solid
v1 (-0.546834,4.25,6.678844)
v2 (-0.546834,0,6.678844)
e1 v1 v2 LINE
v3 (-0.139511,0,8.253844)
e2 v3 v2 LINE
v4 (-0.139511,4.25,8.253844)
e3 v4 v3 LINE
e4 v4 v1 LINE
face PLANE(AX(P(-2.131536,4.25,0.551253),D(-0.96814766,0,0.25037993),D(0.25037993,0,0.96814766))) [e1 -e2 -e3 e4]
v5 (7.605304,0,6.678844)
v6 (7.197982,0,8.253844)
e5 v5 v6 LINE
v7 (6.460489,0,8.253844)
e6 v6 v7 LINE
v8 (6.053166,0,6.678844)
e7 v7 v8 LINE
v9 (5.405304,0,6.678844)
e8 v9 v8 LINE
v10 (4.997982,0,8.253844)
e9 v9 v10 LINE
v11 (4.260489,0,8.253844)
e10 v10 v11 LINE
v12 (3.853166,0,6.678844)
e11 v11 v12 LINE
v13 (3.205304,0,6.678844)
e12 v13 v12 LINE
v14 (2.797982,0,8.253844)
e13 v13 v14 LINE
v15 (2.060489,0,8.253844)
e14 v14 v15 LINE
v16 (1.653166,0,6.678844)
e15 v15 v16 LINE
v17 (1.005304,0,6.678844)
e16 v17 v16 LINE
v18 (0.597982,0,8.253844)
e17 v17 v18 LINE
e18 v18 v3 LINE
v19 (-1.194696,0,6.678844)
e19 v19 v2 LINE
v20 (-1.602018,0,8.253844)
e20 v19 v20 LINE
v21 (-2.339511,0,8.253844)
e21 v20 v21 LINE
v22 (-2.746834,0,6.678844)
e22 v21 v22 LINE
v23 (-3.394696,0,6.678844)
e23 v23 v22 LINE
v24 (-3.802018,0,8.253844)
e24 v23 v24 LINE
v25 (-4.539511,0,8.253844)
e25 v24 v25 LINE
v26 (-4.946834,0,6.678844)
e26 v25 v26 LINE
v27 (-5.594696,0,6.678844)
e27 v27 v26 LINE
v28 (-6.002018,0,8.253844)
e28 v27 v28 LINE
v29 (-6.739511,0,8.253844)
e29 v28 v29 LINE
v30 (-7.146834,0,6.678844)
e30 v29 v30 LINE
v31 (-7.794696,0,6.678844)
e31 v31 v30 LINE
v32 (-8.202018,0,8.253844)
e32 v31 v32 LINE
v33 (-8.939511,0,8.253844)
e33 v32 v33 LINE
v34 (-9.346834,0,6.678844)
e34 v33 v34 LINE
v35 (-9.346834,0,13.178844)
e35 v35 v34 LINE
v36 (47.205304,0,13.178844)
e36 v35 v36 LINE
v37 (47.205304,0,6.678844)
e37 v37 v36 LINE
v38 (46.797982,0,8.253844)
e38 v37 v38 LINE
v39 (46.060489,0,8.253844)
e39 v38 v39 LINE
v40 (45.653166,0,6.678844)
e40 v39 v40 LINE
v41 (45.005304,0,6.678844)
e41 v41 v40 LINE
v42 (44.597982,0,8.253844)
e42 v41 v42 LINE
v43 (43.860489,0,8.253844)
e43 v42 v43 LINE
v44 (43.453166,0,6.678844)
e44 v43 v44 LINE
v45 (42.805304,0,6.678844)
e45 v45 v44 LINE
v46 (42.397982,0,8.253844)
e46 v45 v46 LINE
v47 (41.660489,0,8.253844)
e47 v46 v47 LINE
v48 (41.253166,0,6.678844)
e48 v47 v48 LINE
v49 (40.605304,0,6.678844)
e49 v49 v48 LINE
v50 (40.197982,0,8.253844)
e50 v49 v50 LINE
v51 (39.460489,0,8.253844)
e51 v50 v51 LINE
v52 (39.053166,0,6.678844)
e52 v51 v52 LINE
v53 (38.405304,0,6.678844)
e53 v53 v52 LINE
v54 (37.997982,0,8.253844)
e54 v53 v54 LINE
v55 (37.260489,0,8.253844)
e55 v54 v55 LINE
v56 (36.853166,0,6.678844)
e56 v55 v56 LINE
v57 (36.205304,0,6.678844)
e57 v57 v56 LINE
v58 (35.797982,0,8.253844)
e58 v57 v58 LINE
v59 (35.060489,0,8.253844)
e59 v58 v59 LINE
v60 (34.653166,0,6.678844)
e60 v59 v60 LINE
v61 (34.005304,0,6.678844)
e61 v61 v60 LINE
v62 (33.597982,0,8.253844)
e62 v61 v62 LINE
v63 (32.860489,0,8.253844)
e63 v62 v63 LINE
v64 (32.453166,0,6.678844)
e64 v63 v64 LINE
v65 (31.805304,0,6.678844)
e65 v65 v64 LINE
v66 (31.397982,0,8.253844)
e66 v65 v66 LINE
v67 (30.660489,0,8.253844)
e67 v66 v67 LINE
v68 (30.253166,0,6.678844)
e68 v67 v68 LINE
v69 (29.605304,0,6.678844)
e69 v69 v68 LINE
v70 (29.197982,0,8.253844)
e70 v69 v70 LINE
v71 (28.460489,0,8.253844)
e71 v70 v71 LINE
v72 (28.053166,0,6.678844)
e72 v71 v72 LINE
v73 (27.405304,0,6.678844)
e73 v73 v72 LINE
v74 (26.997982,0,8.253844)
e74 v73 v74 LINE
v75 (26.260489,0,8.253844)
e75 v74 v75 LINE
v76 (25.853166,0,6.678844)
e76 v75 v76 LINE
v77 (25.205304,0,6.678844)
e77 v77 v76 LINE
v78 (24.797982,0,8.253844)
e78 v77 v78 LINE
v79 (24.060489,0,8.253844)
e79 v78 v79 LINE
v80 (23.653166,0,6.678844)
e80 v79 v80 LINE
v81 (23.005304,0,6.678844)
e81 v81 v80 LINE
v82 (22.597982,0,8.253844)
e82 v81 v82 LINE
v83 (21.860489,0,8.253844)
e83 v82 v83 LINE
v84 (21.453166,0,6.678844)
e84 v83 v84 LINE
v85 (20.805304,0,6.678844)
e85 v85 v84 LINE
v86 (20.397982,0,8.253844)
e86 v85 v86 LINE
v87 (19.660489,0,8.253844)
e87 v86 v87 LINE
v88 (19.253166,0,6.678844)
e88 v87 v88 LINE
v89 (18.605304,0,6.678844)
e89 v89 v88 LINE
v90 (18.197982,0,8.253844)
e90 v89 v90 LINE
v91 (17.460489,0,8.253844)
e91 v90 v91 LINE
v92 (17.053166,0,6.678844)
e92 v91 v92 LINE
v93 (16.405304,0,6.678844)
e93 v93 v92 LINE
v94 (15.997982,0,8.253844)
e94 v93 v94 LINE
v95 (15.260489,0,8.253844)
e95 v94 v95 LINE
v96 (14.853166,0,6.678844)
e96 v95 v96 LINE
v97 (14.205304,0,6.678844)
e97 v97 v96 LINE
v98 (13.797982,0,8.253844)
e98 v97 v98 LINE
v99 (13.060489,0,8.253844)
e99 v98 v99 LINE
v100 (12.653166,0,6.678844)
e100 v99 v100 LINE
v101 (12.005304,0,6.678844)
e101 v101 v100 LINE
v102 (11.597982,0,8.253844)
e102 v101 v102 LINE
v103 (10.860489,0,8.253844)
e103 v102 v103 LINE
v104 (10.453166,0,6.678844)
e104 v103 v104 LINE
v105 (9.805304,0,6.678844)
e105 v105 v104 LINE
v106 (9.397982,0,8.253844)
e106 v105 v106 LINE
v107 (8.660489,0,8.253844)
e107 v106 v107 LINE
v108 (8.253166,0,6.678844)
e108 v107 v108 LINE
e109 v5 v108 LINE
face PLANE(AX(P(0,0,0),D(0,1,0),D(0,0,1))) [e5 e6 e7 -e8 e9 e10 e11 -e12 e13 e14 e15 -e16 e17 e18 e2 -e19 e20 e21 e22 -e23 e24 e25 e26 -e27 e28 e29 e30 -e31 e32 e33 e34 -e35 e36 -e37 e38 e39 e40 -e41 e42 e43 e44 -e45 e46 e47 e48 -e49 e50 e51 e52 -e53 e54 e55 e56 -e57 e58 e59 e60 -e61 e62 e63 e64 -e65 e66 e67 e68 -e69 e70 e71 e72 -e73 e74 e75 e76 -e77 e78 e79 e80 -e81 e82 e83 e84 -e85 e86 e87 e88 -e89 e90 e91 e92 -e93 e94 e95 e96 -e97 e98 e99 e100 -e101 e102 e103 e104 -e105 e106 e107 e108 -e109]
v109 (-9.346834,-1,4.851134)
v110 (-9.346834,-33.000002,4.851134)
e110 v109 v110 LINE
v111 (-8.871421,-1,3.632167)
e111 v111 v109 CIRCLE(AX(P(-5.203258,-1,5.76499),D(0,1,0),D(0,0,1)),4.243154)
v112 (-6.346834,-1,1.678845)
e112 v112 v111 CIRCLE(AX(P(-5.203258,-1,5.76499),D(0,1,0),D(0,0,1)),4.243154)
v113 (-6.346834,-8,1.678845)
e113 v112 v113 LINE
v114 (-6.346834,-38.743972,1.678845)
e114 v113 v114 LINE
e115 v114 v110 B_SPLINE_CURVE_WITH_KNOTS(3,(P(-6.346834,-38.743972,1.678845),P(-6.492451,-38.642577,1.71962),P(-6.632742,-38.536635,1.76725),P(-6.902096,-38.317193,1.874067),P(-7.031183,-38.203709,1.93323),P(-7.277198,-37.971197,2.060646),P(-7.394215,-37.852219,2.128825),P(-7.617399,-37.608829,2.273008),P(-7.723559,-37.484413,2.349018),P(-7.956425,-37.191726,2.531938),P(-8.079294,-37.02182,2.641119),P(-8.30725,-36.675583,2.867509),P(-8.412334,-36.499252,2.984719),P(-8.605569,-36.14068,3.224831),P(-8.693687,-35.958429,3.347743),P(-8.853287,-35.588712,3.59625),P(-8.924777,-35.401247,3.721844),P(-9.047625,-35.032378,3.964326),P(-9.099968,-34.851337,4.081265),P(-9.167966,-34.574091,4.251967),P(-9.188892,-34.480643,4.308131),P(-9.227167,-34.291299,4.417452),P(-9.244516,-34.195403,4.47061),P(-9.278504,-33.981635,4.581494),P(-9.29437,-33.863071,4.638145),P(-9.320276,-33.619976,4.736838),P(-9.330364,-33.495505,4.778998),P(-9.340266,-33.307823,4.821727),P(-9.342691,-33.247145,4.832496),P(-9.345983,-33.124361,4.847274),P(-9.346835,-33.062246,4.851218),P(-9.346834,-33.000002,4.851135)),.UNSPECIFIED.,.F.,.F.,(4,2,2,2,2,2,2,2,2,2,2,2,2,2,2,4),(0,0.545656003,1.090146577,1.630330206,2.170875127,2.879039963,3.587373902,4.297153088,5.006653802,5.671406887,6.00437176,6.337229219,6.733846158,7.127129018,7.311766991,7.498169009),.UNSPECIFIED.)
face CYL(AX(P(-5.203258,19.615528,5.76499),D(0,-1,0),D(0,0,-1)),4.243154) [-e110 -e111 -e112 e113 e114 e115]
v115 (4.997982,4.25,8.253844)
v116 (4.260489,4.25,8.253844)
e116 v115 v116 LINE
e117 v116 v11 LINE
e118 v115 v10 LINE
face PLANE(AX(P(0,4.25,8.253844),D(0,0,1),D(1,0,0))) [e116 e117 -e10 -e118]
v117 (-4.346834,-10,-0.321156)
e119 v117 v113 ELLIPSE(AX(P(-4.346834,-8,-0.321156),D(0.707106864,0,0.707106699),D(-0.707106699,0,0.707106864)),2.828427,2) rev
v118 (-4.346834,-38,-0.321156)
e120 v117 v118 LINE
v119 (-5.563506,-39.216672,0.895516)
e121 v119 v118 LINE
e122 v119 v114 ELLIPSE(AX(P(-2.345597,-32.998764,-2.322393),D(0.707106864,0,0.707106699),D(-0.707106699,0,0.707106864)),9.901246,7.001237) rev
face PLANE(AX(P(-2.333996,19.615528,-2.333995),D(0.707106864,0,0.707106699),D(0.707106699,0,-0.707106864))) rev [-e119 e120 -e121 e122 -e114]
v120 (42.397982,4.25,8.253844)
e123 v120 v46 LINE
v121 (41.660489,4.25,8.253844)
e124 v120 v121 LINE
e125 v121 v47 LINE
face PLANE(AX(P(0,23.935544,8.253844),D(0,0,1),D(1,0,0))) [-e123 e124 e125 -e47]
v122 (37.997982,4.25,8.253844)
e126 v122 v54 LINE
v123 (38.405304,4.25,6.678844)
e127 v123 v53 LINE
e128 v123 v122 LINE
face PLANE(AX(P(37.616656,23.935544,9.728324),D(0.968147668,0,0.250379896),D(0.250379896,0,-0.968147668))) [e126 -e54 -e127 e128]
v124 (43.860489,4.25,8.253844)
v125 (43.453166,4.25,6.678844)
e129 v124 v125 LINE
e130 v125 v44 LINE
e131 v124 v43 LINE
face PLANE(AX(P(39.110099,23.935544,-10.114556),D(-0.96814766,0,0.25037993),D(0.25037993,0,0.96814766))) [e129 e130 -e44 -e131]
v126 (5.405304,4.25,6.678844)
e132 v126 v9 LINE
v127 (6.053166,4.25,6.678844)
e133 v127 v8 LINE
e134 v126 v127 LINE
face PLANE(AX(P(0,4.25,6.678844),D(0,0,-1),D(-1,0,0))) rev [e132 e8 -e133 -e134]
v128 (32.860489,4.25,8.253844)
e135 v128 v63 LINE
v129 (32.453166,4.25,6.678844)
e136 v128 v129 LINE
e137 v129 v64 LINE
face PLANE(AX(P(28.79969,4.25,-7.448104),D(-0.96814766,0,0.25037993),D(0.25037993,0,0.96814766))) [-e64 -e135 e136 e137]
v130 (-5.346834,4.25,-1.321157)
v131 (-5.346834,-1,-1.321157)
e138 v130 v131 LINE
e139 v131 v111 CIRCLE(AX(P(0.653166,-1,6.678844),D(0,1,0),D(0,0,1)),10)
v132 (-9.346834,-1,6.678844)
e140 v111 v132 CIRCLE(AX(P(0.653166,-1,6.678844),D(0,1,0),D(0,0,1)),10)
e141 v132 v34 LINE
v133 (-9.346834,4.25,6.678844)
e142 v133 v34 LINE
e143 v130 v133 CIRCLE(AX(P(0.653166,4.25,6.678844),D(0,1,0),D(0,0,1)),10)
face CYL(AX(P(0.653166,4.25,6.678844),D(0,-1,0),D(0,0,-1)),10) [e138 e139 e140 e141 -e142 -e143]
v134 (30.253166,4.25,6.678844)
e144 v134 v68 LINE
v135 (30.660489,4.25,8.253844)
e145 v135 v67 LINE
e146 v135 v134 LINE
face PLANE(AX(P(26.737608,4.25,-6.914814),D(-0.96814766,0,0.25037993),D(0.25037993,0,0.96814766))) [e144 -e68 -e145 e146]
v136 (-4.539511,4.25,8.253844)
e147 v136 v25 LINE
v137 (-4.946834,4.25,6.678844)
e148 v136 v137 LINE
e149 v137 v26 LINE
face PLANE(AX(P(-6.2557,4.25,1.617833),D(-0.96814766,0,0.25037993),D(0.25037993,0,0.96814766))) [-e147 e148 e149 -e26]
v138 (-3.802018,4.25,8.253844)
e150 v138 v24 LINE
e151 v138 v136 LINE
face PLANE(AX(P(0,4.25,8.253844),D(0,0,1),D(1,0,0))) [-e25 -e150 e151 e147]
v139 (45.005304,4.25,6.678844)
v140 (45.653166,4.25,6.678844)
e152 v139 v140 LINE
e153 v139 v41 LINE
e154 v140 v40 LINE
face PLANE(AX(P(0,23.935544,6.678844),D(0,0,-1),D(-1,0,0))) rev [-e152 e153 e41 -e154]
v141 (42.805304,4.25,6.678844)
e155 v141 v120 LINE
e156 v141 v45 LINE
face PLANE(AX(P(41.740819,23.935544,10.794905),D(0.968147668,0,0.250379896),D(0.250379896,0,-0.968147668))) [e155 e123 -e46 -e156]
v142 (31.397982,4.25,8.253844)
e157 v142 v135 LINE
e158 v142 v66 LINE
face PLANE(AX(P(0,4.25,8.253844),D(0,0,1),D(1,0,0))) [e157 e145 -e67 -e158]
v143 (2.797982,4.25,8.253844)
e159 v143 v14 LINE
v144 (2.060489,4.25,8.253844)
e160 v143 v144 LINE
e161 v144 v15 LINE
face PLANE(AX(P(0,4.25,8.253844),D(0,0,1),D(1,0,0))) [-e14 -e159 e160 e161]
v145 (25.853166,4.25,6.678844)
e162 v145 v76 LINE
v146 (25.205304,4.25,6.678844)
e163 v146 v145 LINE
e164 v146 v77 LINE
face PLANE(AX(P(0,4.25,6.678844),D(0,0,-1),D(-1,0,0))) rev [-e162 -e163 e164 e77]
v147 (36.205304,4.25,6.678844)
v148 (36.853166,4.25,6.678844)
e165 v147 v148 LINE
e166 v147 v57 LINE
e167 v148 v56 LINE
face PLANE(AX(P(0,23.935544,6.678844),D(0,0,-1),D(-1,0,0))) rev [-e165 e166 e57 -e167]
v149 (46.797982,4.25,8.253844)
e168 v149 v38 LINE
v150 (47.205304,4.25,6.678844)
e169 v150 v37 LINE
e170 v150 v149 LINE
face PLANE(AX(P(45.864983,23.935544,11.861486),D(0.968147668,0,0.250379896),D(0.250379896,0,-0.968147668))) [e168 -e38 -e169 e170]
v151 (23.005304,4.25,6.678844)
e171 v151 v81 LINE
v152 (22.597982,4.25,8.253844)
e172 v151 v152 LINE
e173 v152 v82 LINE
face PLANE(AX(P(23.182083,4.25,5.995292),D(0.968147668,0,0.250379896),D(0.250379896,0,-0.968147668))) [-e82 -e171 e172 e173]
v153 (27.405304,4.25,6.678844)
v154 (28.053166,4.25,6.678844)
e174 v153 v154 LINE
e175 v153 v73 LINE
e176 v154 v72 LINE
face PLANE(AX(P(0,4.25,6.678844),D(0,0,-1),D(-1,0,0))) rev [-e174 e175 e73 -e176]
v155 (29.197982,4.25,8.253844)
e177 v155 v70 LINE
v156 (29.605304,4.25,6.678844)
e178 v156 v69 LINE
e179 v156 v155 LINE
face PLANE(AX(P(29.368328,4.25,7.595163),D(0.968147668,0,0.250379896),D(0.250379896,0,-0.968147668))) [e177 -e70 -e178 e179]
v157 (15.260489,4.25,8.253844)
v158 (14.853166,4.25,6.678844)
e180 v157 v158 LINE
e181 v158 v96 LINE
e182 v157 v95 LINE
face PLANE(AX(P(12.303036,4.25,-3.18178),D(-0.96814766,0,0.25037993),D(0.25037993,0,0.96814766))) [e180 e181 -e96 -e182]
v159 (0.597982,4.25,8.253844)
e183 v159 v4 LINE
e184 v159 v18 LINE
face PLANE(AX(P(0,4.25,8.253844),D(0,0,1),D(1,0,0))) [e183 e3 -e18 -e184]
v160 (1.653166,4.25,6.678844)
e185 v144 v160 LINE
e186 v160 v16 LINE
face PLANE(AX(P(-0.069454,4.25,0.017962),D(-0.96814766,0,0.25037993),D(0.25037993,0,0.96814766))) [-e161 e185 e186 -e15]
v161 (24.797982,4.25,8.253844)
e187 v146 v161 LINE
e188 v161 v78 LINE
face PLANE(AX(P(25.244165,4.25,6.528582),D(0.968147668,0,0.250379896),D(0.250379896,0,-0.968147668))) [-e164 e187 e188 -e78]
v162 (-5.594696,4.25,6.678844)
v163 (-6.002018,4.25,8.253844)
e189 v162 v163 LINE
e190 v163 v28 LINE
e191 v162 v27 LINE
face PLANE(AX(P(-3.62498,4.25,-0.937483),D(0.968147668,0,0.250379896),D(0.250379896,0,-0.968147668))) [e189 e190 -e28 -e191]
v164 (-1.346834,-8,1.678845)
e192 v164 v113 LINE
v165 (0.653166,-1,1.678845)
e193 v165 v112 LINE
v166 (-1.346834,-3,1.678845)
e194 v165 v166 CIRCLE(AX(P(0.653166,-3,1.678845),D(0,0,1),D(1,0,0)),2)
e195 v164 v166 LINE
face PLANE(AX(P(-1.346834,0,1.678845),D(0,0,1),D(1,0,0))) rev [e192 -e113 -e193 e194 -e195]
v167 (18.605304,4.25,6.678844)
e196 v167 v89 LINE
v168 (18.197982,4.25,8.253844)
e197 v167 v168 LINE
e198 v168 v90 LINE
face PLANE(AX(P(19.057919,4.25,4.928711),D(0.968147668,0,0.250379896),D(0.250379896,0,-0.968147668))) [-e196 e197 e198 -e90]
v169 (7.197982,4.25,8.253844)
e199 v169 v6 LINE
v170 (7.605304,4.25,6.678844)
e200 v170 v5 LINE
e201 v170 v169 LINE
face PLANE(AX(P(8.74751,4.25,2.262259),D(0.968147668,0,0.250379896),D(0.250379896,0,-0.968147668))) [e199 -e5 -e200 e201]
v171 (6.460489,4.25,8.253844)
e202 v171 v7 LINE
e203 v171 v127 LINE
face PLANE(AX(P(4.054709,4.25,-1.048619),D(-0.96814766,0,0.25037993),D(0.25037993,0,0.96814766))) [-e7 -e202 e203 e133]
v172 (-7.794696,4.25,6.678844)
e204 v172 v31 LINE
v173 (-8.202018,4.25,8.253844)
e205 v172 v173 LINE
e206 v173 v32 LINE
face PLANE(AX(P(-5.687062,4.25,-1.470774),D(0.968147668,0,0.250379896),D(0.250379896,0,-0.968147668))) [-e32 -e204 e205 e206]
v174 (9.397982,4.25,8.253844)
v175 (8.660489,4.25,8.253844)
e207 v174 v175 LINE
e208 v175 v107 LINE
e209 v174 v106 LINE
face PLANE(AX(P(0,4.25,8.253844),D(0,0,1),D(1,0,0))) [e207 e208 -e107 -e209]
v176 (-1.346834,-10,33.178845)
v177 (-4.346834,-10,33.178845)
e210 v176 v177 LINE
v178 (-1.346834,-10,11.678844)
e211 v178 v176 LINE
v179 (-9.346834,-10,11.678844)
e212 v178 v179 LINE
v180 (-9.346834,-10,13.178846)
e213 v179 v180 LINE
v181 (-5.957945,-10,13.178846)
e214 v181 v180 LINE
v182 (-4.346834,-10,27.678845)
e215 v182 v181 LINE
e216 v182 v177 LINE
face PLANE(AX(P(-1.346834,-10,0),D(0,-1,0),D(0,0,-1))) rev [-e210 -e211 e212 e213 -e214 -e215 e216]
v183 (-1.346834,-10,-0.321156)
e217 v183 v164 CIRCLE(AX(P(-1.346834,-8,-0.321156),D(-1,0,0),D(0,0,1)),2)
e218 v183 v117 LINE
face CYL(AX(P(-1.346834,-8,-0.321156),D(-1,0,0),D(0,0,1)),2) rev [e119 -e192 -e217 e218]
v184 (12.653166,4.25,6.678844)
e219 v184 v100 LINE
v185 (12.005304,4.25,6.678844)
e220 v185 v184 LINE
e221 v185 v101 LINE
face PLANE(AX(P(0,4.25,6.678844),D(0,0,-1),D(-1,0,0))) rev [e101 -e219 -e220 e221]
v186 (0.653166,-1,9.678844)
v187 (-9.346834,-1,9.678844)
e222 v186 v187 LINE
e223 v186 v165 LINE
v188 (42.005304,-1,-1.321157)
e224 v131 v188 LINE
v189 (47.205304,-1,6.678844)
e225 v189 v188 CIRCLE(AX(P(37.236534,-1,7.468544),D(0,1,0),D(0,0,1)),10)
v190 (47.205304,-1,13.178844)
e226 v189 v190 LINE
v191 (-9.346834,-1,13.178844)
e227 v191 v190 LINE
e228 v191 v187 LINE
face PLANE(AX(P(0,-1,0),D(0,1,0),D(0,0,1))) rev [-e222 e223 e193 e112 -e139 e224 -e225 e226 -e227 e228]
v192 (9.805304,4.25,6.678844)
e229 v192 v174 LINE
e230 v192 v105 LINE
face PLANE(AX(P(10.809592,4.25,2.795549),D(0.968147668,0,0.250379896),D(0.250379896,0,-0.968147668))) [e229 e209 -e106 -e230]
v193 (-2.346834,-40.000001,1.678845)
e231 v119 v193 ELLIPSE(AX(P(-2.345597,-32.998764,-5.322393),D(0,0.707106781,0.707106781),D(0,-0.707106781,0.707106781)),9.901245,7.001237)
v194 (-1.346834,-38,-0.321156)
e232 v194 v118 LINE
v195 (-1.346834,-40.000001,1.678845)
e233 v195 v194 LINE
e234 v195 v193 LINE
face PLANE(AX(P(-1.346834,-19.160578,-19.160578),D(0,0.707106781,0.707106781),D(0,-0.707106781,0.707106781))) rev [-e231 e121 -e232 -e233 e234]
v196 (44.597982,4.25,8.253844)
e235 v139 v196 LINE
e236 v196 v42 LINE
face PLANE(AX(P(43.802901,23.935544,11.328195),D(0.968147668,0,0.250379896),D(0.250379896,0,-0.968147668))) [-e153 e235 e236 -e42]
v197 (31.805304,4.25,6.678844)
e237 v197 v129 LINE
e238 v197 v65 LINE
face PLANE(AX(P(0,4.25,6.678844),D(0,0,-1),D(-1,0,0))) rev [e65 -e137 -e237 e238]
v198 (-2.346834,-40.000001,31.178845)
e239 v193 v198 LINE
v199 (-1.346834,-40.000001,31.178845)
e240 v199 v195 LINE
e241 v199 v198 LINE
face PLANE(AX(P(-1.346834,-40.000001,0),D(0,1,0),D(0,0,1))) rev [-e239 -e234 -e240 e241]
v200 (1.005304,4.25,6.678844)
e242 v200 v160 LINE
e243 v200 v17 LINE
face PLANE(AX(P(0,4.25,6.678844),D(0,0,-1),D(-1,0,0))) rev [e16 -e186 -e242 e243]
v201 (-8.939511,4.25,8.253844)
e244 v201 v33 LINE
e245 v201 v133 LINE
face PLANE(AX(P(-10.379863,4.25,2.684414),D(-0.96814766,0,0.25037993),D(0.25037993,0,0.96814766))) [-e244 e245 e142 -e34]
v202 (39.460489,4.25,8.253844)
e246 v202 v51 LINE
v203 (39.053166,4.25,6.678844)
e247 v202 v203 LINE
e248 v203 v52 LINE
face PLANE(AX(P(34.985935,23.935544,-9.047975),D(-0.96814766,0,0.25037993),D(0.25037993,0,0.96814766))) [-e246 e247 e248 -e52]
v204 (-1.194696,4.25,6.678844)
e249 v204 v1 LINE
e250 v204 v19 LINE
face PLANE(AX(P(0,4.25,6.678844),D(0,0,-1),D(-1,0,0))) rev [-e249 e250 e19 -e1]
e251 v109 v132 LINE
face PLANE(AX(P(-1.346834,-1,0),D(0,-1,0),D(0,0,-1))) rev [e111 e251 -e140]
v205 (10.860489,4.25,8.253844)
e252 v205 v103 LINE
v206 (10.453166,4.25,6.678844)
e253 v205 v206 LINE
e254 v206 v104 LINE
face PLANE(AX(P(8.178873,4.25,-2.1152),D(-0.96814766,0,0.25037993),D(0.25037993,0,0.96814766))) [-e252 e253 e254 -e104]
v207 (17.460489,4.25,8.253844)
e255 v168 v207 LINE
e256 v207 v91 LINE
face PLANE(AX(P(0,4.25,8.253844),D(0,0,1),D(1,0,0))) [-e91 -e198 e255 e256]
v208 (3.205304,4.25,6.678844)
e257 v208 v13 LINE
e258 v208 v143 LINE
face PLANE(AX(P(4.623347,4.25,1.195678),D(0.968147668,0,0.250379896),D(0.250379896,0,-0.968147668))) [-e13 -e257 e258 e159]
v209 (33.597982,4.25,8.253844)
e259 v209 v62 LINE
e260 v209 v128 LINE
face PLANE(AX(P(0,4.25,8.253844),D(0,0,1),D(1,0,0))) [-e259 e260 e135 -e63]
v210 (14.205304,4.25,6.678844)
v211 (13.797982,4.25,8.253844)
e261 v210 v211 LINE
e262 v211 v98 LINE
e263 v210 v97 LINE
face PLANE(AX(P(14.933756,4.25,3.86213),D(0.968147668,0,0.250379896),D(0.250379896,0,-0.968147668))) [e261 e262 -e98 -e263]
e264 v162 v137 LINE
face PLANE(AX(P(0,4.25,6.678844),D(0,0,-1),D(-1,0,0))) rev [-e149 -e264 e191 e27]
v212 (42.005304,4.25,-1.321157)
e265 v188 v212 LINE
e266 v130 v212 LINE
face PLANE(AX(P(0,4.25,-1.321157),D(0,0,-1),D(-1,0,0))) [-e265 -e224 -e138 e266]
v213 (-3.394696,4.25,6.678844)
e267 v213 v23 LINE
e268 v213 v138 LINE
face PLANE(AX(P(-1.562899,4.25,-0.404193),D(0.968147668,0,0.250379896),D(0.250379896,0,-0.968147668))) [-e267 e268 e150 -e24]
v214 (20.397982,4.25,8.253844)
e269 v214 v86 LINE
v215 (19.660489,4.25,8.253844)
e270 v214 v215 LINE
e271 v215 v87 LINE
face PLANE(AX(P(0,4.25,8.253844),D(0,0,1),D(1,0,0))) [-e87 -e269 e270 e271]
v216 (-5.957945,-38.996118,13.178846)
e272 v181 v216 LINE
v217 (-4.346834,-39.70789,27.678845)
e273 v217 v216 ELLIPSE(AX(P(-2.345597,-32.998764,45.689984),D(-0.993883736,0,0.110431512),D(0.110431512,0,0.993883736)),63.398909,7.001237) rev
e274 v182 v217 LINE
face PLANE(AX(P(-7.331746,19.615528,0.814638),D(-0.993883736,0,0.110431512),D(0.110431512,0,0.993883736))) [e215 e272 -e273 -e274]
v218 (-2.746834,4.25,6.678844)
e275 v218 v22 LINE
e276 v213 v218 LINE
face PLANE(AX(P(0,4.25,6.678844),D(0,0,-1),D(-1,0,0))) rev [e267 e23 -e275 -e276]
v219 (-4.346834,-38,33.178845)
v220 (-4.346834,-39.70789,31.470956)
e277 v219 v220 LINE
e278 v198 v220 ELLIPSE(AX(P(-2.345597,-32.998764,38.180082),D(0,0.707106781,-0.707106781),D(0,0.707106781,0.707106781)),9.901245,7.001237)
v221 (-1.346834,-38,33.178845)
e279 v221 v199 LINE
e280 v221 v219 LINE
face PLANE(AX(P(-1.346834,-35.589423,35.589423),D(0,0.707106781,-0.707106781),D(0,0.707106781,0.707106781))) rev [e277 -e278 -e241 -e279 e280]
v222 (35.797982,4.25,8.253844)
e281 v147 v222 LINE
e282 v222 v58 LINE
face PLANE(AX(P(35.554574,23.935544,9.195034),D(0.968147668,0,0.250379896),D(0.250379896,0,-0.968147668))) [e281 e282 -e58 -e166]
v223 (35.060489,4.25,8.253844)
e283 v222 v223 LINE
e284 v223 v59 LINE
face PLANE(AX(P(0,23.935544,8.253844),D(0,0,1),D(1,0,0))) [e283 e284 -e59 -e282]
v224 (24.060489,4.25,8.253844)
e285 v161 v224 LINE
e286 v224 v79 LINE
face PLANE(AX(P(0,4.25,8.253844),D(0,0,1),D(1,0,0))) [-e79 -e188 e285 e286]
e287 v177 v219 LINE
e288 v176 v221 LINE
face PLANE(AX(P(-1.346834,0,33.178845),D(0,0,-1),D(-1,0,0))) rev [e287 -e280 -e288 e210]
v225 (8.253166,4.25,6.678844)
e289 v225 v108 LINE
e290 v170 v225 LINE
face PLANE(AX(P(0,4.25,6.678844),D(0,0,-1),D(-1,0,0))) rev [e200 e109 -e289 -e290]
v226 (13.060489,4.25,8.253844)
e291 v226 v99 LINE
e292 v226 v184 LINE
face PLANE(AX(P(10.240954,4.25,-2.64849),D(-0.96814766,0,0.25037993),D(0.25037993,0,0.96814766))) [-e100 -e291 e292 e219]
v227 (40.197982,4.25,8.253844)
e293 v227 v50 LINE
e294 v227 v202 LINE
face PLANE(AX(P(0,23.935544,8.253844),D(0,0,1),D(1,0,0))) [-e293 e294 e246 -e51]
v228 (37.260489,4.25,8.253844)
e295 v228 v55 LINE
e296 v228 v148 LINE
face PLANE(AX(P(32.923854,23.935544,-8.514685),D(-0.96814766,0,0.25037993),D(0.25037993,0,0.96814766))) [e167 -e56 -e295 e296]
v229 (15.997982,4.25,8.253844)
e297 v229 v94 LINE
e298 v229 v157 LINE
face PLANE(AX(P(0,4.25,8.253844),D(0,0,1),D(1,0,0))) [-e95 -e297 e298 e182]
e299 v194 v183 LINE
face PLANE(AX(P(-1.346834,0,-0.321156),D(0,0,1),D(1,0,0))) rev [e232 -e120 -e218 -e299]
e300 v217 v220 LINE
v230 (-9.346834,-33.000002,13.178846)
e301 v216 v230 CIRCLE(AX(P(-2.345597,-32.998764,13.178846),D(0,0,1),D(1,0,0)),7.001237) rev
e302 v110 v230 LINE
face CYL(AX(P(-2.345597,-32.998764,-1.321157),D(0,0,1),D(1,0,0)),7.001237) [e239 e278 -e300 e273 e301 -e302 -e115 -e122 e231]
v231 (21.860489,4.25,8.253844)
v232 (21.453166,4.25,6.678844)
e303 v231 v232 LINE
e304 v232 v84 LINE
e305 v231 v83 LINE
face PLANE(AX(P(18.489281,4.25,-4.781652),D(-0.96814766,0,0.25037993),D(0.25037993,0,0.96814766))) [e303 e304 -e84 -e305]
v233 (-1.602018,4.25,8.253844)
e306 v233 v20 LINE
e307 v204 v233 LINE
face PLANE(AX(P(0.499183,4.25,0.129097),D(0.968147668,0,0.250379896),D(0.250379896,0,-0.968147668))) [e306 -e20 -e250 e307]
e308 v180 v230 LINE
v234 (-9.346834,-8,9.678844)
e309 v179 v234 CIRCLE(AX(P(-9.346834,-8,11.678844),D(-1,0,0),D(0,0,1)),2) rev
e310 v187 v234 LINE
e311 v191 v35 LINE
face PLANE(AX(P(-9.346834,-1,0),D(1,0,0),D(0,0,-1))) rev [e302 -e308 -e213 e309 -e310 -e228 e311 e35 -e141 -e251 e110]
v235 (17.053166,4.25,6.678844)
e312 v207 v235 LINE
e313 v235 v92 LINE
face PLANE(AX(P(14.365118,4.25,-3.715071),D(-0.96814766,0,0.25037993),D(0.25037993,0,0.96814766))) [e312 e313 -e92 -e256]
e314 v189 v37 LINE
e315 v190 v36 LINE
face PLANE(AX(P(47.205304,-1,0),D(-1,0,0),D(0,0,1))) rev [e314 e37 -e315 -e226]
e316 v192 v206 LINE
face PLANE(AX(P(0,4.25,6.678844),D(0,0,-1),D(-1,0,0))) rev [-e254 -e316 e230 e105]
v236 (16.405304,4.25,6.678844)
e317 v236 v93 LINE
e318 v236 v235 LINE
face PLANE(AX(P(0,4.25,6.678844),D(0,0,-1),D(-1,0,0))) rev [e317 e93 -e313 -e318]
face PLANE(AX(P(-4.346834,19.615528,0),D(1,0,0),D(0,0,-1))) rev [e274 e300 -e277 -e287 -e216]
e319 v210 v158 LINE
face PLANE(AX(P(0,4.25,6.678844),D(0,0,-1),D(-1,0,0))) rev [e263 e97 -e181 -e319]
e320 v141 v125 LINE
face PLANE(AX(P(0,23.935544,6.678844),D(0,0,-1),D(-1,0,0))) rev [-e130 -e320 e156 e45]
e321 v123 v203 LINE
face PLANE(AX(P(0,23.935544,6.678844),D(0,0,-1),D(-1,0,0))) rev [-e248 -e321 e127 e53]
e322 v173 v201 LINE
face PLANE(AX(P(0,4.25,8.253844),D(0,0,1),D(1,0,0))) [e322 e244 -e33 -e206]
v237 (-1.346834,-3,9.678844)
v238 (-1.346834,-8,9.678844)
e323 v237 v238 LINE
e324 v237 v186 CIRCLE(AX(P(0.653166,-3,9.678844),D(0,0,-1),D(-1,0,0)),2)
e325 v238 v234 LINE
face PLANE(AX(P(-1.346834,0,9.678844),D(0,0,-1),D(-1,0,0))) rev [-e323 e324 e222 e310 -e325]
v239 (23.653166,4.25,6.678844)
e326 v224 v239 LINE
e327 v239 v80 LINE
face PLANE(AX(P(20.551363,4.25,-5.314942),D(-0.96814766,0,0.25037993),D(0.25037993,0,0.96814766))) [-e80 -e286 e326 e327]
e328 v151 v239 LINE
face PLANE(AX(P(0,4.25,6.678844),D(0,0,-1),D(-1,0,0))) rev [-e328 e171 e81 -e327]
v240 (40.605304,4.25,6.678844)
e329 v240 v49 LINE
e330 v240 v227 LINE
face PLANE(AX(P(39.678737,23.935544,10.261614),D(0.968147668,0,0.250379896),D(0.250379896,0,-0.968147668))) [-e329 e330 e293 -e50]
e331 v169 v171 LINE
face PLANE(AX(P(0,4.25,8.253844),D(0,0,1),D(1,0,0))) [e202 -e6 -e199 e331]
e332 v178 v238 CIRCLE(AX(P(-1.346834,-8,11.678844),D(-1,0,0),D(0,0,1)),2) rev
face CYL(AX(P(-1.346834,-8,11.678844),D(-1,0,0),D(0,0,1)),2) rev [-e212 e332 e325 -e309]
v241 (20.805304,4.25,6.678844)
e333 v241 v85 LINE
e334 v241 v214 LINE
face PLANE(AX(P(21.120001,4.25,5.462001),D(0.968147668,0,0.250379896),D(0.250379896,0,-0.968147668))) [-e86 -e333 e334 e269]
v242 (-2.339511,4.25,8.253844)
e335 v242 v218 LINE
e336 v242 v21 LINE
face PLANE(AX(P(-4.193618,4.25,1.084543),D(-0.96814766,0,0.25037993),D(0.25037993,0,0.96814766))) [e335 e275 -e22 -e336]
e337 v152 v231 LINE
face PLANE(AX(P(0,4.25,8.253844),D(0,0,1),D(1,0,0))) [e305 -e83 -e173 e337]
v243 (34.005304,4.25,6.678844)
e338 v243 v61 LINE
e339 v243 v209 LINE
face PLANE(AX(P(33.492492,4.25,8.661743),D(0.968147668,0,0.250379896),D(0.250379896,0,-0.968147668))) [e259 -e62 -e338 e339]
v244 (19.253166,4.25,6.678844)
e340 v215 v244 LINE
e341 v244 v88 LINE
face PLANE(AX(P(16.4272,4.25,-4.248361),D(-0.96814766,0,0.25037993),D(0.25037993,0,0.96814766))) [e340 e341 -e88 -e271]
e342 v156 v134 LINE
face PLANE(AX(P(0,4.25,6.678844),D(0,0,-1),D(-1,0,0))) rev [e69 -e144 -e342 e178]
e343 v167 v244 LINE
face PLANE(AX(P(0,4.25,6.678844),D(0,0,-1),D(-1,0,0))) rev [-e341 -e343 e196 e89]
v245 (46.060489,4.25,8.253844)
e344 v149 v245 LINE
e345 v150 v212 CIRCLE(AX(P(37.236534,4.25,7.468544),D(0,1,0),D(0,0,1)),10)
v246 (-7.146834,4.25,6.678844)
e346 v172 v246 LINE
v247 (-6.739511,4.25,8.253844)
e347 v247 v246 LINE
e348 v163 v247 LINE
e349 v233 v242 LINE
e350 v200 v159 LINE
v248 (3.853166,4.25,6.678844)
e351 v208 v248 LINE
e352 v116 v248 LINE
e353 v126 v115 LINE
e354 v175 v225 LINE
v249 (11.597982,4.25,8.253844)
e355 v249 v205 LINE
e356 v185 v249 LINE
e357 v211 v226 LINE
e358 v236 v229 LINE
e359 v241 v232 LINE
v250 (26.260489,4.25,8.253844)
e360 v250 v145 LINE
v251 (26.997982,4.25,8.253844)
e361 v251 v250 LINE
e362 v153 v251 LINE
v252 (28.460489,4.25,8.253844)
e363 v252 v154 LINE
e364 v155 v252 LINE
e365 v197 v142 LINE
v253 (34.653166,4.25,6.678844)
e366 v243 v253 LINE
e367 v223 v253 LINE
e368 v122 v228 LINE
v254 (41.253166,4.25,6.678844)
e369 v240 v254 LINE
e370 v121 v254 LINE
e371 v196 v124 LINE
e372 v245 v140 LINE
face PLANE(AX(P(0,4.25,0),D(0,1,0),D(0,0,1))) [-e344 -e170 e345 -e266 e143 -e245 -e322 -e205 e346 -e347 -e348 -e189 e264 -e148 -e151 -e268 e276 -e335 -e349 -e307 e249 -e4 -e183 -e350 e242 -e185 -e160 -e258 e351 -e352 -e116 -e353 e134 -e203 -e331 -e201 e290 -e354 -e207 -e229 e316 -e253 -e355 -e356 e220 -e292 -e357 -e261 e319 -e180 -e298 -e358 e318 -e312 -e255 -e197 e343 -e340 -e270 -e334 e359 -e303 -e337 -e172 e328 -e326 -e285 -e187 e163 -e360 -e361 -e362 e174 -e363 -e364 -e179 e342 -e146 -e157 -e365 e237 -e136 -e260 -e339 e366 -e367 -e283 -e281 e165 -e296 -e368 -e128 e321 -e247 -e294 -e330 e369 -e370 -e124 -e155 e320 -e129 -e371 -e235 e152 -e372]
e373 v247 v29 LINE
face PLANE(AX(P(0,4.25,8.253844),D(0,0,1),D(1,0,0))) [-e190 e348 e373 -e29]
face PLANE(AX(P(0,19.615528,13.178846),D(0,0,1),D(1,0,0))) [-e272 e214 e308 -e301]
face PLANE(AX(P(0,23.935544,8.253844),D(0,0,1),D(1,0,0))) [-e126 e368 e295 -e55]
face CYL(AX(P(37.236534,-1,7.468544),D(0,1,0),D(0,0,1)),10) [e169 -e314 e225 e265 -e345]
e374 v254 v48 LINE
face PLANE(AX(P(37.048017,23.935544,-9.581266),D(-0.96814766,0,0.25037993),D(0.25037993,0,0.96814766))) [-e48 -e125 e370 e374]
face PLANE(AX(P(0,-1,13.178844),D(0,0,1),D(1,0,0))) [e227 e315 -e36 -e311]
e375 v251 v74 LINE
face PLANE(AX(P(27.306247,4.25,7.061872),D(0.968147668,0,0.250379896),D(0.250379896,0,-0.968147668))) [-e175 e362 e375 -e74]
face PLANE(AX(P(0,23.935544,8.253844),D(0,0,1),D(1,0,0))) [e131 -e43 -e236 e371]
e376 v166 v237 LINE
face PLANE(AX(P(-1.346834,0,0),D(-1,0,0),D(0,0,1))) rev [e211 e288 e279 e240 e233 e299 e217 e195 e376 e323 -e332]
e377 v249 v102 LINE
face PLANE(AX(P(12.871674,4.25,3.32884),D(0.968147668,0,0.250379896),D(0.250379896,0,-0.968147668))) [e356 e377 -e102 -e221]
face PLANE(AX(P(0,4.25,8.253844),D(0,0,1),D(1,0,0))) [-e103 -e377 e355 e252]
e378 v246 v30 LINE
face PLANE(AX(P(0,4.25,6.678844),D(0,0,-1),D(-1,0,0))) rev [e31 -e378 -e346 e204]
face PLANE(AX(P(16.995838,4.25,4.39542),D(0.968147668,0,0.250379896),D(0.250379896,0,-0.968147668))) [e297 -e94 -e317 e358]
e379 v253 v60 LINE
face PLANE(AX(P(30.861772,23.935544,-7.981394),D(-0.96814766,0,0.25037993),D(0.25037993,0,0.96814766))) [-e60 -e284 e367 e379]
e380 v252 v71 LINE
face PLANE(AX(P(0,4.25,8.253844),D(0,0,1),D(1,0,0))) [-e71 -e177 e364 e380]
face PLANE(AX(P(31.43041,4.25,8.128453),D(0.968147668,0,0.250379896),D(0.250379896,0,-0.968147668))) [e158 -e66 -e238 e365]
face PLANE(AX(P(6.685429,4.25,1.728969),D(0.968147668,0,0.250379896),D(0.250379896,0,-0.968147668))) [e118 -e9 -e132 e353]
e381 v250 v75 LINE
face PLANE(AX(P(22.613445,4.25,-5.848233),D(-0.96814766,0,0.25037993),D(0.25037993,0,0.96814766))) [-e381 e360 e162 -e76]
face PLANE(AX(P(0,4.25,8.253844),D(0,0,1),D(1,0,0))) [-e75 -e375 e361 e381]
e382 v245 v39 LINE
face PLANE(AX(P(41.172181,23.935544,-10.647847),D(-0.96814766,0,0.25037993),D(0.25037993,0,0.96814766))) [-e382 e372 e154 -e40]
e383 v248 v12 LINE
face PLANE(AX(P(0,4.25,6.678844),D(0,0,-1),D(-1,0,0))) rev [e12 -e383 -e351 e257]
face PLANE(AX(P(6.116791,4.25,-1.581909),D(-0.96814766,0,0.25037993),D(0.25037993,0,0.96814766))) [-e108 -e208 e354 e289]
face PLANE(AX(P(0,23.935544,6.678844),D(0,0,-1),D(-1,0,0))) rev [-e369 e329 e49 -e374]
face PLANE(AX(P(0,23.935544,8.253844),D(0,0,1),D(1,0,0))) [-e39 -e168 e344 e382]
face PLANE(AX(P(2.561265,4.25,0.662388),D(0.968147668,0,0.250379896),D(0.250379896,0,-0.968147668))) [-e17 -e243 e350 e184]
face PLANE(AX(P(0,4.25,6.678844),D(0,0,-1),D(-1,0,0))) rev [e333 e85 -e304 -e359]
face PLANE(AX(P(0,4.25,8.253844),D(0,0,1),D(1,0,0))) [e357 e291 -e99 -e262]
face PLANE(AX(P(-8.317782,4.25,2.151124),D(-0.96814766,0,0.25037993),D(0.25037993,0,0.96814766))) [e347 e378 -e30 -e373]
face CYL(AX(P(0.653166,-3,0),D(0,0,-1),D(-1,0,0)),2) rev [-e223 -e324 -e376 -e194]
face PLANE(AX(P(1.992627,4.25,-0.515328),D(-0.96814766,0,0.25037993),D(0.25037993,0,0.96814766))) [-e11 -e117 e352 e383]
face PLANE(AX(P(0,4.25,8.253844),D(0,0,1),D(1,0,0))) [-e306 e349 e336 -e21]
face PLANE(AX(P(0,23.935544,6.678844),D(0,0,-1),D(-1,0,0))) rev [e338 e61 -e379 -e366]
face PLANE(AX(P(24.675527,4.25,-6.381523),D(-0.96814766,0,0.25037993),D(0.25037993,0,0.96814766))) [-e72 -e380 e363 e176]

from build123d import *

# Parameters (mm, degrees)
BOSS_EXTRUDE1_DEPTH = 4.25
BOSS_EXTRUDE2_START = -1
BOSS_EXTRUDE2_DEPTH = 1
BOSS_EXTRUDE3_DEPTH = 8
CUT_EXTRUDE2_DEPTH  = 63.822057505
CUT_EXTRUDE4_START  = -39.000000805
CUT_EXTRUDE4_DEPTH  = 38.707889695
BOSS_EXTRUDE5_START = -1
BOSS_EXTRUDE5_DEPTH = 1
BOSS_EXTRUDE6_DEPTH = 4.25
FILLET1_R           = 2


# Read off the part's stored shape, not the designer's step: Cut-Extrude4
with BuildPart() as part:
    # Sketch1 → Boss-Extrude1 (new body)
    with BuildSketch(Plane(origin=(0, 0, 0), x_dir=(1, 0, 0), z_dir=(0, 1, 0))):
        with BuildLine():
            Line((33.597981706, -8.253844427), (34.005304366, -6.678843843))
            ThreePointArc((34.005304366, -6.678843843), (32.949576248, -2.206707665), (30.005304176, 1.321156537))
            Line((30.005304176, 1.321156537), (-5.346833689, 1.321156537))
            ThreePointArc((-5.346833689, 1.321156537), (-8.291105761, -2.206707665), (-9.346833879, -6.678843843))
            Line((-9.346833879, -6.678843843), (-8.939511162, -8.253844427))
            Line((-8.939511162, -8.253844427), (-8.202018294, -8.253844427))
            Line((-8.202018294, -8.253844427), (-7.794695634, -6.678843843))
            Line((-7.794695634, -6.678843843), (-7.146833879, -6.678843843))
            Line((-7.146833879, -6.678843843), (-6.739511162, -8.253844427))
            Line((-6.739511162, -8.253844427), (-6.002018294, -8.253844427))
            Line((-6.002018294, -8.253844427), (-5.594695634, -6.678843843))
            Line((-5.594695634, -6.678843843), (-4.946833879, -6.678843843))
            Line((-4.946833879, -6.678843843), (-4.539511162, -8.253844427))
            Line((-4.539511162, -8.253844427), (-3.802018294, -8.253844427))
            Line((-3.802018294, -8.253844427), (-3.394695634, -6.678843843))
            Line((-3.394695634, -6.678843843), (-2.746833879, -6.678843843))
            Line((-2.746833879, -6.678843843), (-2.339511162, -8.253844427))
            Line((-2.339511162, -8.253844427), (-1.602018294, -8.253844427))
            Line((-1.602018294, -8.253844427), (-1.194695634, -6.678843843))
            Line((-1.194695634, -6.678843843), (-0.546833879, -6.678843843))
            Line((-0.546833879, -6.678843843), (-0.139511162, -8.253844427))
            Line((-0.139511162, -8.253844427), (0.597981706, -8.253844427))
            Line((0.597981706, -8.253844427), (1.005304366, -6.678843843))
            Line((1.005304366, -6.678843843), (1.653166121, -6.678843843))
            Line((1.653166121, -6.678843843), (2.060488838, -8.253844427))
            Line((2.060488838, -8.253844427), (2.797981706, -8.253844427))
            Line((2.797981706, -8.253844427), (3.205304366, -6.678843843))
            Line((3.205304366, -6.678843843), (3.853166121, -6.678843843))
            Line((3.853166121, -6.678843843), (4.260488838, -8.253844427))
            Line((4.260488838, -8.253844427), (4.997981706, -8.253844427))
            Line((4.997981706, -8.253844427), (5.405304366, -6.678843843))
            Line((5.405304366, -6.678843843), (6.053166121, -6.678843843))
            Line((6.053166121, -6.678843843), (6.460488838, -8.253844427))
            Line((6.460488838, -8.253844427), (7.197981706, -8.253844427))
            Line((7.197981706, -8.253844427), (7.605304366, -6.678843843))
            Line((7.605304366, -6.678843843), (8.253166121, -6.678843843))
            Line((8.253166121, -6.678843843), (8.660488838, -8.253844427))
            Line((8.660488838, -8.253844427), (9.397981706, -8.253844427))
            Line((9.397981706, -8.253844427), (9.805304366, -6.678843843))
            Line((9.805304366, -6.678843843), (10.453166121, -6.678843843))
            Line((10.453166121, -6.678843843), (10.860488838, -8.253844427))
            Line((10.860488838, -8.253844427), (11.597981706, -8.253844427))
            Line((11.597981706, -8.253844427), (12.005304366, -6.678843843))
            Line((12.005304366, -6.678843843), (12.653166121, -6.678843843))
            Line((12.653166121, -6.678843843), (13.060488838, -8.253844427))
            Line((13.060488838, -8.253844427), (13.797981706, -8.253844427))
            Line((13.797981706, -8.253844427), (14.205304366, -6.678843843))
            Line((14.205304366, -6.678843843), (14.853166121, -6.678843843))
            Line((14.853166121, -6.678843843), (15.260488838, -8.253844427))
            Line((15.260488838, -8.253844427), (15.997981706, -8.253844427))
            Line((15.997981706, -8.253844427), (16.405304366, -6.678843843))
            Line((16.405304366, -6.678843843), (17.053166121, -6.678843843))
            Line((17.053166121, -6.678843843), (17.460488838, -8.253844427))
            Line((17.460488838, -8.253844427), (18.197981706, -8.253844427))
            Line((18.197981706, -8.253844427), (18.605304366, -6.678843843))
            Line((18.605304366, -6.678843843), (19.253166121, -6.678843843))
            Line((19.253166121, -6.678843843), (19.660488838, -8.253844427))
            Line((19.660488838, -8.253844427), (20.397981706, -8.253844427))
            Line((20.397981706, -8.253844427), (20.805304366, -6.678843843))
            Line((20.805304366, -6.678843843), (21.453166121, -6.678843843))
            Line((21.453166121, -6.678843843), (21.860488838, -8.253844427))
            Line((21.860488838, -8.253844427), (22.597981706, -8.253844427))
            Line((22.597981706, -8.253844427), (23.005304366, -6.678843843))
            Line((23.005304366, -6.678843843), (23.653166121, -6.678843843))
            Line((23.653166121, -6.678843843), (24.060488838, -8.253844427))
            Line((24.060488838, -8.253844427), (24.797981706, -8.253844427))
            Line((24.797981706, -8.253844427), (25.205304366, -6.678843843))
            Line((25.205304366, -6.678843843), (25.853166121, -6.678843843))
            Line((25.853166121, -6.678843843), (26.260488838, -8.253844427))
            Line((26.260488838, -8.253844427), (26.997981706, -8.253844427))
            Line((26.997981706, -8.253844427), (27.405304366, -6.678843843))
            Line((27.405304366, -6.678843843), (28.053166121, -6.678843843))
            Line((28.053166121, -6.678843843), (28.460488838, -8.253844427))
            Line((28.460488838, -8.253844427), (29.197981706, -8.253844427))
            Line((29.197981706, -8.253844427), (29.605304366, -6.678843843))
            Line((29.605304366, -6.678843843), (30.253166121, -6.678843843))
            Line((30.253166121, -6.678843843), (30.660488838, -8.253844427))
            Line((30.660488838, -8.253844427), (31.397981706, -8.253844427))
            Line((31.397981706, -8.253844427), (31.805304366, -6.678843843))
            Line((31.805304366, -6.678843843), (32.453166121, -6.678843843))
            Line((32.453166121, -6.678843843), (32.860488838, -8.253844427))
            Line((32.860488838, -8.253844427), (33.597981706, -8.253844427))
        make_face()
    extrude(amount=BOSS_EXTRUDE1_DEPTH)

    # Sketch1<3> → Boss-Extrude2 (add)
    with BuildSketch(Plane(origin=(0, 0, 0), x_dir=(1, 0, 0), z_dir=(0, 1, 0)).offset(BOSS_EXTRUDE2_START)):
        with BuildLine():
            Line((34.005304366, -6.678843843), (34.005304366, -13.178843977))
            Line((34.005304366, -13.178843977), (-9.346833879, -13.178843977))
            Line((-9.346833879, -13.178843977), (-9.346833879, -6.678843843))
            ThreePointArc((-9.346833879, -6.678843843), (-8.291105761, -2.206707665), (-5.346833689, 1.321156537))
            Line((-5.346833689, 1.321156537), (30.005304176, 1.321156537))
            ThreePointArc((30.005304176, 1.321156537), (32.949576248, -2.206707665), (34.005304366, -6.678843843))
        make_face()
    extrude(amount=BOSS_EXTRUDE2_DEPTH)

    # Sketch2 → Boss-Extrude3 (add)
    with BuildSketch(Plane.ZY.offset(9.346833879)):
        with BuildLine():
            Line((-0.321155635, -9.999999776), (-0.321155635, -38.000000477))
            Line((-0.321155635, -38.000000477), (1.678844693, -40.000000805))
            Line((1.678844693, -40.000000805), (31.178844871, -40.000000805))
            Line((31.178844871, -40.000000805), (33.178845199, -38.000000477))
            Line((33.178845199, -38.000000477), (33.178845199, -9.999999613))
            Line((33.178845199, -9.999999613), (11.678843977, -9.999999613))
            ThreePointArc((11.678843977, -9.999999613), (10.264630415, -9.414213175), (9.678843977, -7.999999613))
            Line((9.678843977, -7.999999613), (9.678843977, -1))
            Line((9.678843977, -1), (6.678843843, -1))
            Line((6.678843843, -1), (1.678844529, -1))
            Line((1.678844529, -1), (1.678844529, -7.999999613))
            ThreePointArc((1.678844529, -7.999999613), (1.093058043, -9.414213291), (-0.321155635, -9.999999776))
        make_face()
    extrude(amount=-BOSS_EXTRUDE3_DEPTH)

    # Sketch3 → Cut-Extrude2 (cut, through all)
    with BuildSketch(Plane.XY.offset(33.178845199)):
        with BuildLine():
            ThreePointArc((-2.346834043, -40.000000805), (-7.296219092, -37.949386296), (-9.346834259, -33.00000152))
            Line((-9.346834259, -33.00000152), (-9.346834259, -40.000000805))
            Line((-9.346834259, -40.000000805), (-2.346834043, -40.000000805))
        make_face()
    extrude(amount=-CUT_EXTRUDE2_DEPTH, mode=Mode.SUBTRACT)

    # Cut-Extrude4 outline → Cut-Extrude4 (cut)
    with BuildSketch(Plane.XZ.offset(40.000000805).offset(CUT_EXTRUDE4_START)):
        with BuildLine():
            ThreePointArc((-6.346834233, 1.678844693), (-8.286187836, 2.849531896), (-9.346844813, 4.85118314))
            Line((-9.346844813, 4.85118314), (-9.346833879, 1.678844529))
            Line((-9.346833879, 1.678844529), (-6.346834233, 1.678844693))
        make_face()
        Polygon((-9.346834259, 13.178845646), (-5.957945227, 13.178845646), (-4.346834371, 27.678845229), (-4.346834371, 33.178845199), (-9.346833879, 33.178845199), align=None)
        Polygon((-4.346834371, -0.321155635), (-6.346834233, 1.678844693), (-9.346833879, 1.678844529), (-9.346833879, -0.321155635), align=None)
    extrude(amount=CUT_EXTRUDE4_DEPTH, mode=Mode.SUBTRACT)

    # Sketch5 → Boss-Extrude5 (add)
    with BuildSketch(Plane(origin=(0, 0, 0), x_dir=(1, 0, 0), z_dir=(0, 1, 0)).offset(BOSS_EXTRUDE5_START)):
        with BuildLine():
            Line((47.205304366, -6.678843843), (46.797981706, -8.253844427))
            Line((46.797981706, -8.253844427), (46.060488838, -8.253844427))
            Line((46.060488838, -8.253844427), (45.653166121, -6.678843843))
            Line((45.653166121, -6.678843843), (45.005304366, -6.678843843))
            Line((45.005304366, -6.678843843), (44.597981706, -8.253844427))
            Line((44.597981706, -8.253844427), (43.860488838, -8.253844427))
            Line((43.860488838, -8.253844427), (43.453166121, -6.678843843))
            Line((43.453166121, -6.678843843), (42.805304366, -6.678843843))
            Line((42.805304366, -6.678843843), (42.397981706, -8.253844427))
            Line((42.397981706, -8.253844427), (41.660488838, -8.253844427))
            Line((41.660488838, -8.253844427), (41.253166121, -6.678843843))
            Line((41.253166121, -6.678843843), (40.605304366, -6.678843843))
            Line((40.605304366, -6.678843843), (40.197981706, -8.253844427))
            Line((40.197981706, -8.253844427), (39.460488838, -8.253844427))
            Line((39.460488838, -8.253844427), (39.053166121, -6.678843843))
            Line((39.053166121, -6.678843843), (38.405304366, -6.678843843))
            Line((38.405304366, -6.678843843), (37.997981706, -8.253844427))
            Line((37.997981706, -8.253844427), (37.260488838, -8.253844427))
            Line((37.260488838, -8.253844427), (36.853166121, -6.678843843))
            Line((36.853166121, -6.678843843), (36.205304366, -6.678843843))
            Line((36.205304366, -6.678843843), (35.797981706, -8.253844427))
            Line((35.797981706, -8.253844427), (35.060488838, -8.253844427))
            Line((35.060488838, -8.253844427), (34.653166121, -6.678843843))
            Line((34.653166121, -6.678843843), (34.005304366, -6.678843843))
            ThreePointArc((34.005304366, -6.678843843), (32.949576248, -2.206707665), (30.005304176, 1.321156537))
            Line((30.005304176, 1.321156537), (42.005304176, 1.321156537))
            ThreePointArc((42.005304176, 1.321156537), (45.620970607, -2.018660542), (47.205304366, -6.678843843))
        make_face()
        Polygon((45.005304366, -6.678843843), (45.653166121, -6.678843843), (46.060488838, -8.253844427), (46.797981706, -8.253844427), (47.205304366, -6.678843843), (47.205304366, -13.178843977), (34.005304366, -13.178843977), (34.005304366, -6.678843843), (34.653166121, -6.678843843), (35.060488838, -8.253844427), (35.797981706, -8.253844427), (36.205304366, -6.678843843), (36.853166121, -6.678843843), (37.260488838, -8.253844427), (37.997981706, -8.253844427), (38.405304366, -6.678843843), (39.053166121, -6.678843843), (39.460488838, -8.253844427), (40.197981706, -8.253844427), (40.605304366, -6.678843843), (41.253166121, -6.678843843), (41.660488838, -8.253844427), (42.397981706, -8.253844427), (42.805304366, -6.678843843), (43.453166121, -6.678843843), (43.860488838, -8.253844427), (44.597981706, -8.253844427), align=None)
    extrude(amount=BOSS_EXTRUDE5_DEPTH)

    # Sketch5<3> → Boss-Extrude6 (add)
    with BuildSketch(Plane(origin=(0, 0, 0), x_dir=(1, 0, 0), z_dir=(0, 1, 0))):
        with BuildLine():
            Line((47.205304366, -6.678843843), (46.797981706, -8.253844427))
            Line((46.797981706, -8.253844427), (46.060488838, -8.253844427))
            Line((46.060488838, -8.253844427), (45.653166121, -6.678843843))
            Line((45.653166121, -6.678843843), (45.005304366, -6.678843843))
            Line((45.005304366, -6.678843843), (44.597981706, -8.253844427))
            Line((44.597981706, -8.253844427), (43.860488838, -8.253844427))
            Line((43.860488838, -8.253844427), (43.453166121, -6.678843843))
            Line((43.453166121, -6.678843843), (42.805304366, -6.678843843))
            Line((42.805304366, -6.678843843), (42.397981706, -8.253844427))
            Line((42.397981706, -8.253844427), (41.660488838, -8.253844427))
            Line((41.660488838, -8.253844427), (41.253166121, -6.678843843))
            Line((41.253166121, -6.678843843), (40.605304366, -6.678843843))
            Line((40.605304366, -6.678843843), (40.197981706, -8.253844427))
            Line((40.197981706, -8.253844427), (39.460488838, -8.253844427))
            Line((39.460488838, -8.253844427), (39.053166121, -6.678843843))
            Line((39.053166121, -6.678843843), (38.405304366, -6.678843843))
            Line((38.405304366, -6.678843843), (37.997981706, -8.253844427))
            Line((37.997981706, -8.253844427), (37.260488838, -8.253844427))
            Line((37.260488838, -8.253844427), (36.853166121, -6.678843843))
            Line((36.853166121, -6.678843843), (36.205304366, -6.678843843))
            Line((36.205304366, -6.678843843), (35.797981706, -8.253844427))
            Line((35.797981706, -8.253844427), (35.060488838, -8.253844427))
            Line((35.060488838, -8.253844427), (34.653166121, -6.678843843))
            Line((34.653166121, -6.678843843), (34.005304366, -6.678843843))
            ThreePointArc((34.005304366, -6.678843843), (32.949576248, -2.206707665), (30.005304176, 1.321156537))
            Line((30.005304176, 1.321156537), (42.005304176, 1.321156537))
            ThreePointArc((42.005304176, 1.321156537), (45.620970607, -2.018660542), (47.205304366, -6.678843843))
        make_face()
    extrude(amount=BOSS_EXTRUDE6_DEPTH)

    # Fillet1
    fillet1_edges = [part.edges().sort_by_distance(p)[0] for p in [
        (-1.346833879, -1, 5.678844253),
    ]]
    fillet(fillet1_edges, radius=FILLET1_R)


solid = part.part
